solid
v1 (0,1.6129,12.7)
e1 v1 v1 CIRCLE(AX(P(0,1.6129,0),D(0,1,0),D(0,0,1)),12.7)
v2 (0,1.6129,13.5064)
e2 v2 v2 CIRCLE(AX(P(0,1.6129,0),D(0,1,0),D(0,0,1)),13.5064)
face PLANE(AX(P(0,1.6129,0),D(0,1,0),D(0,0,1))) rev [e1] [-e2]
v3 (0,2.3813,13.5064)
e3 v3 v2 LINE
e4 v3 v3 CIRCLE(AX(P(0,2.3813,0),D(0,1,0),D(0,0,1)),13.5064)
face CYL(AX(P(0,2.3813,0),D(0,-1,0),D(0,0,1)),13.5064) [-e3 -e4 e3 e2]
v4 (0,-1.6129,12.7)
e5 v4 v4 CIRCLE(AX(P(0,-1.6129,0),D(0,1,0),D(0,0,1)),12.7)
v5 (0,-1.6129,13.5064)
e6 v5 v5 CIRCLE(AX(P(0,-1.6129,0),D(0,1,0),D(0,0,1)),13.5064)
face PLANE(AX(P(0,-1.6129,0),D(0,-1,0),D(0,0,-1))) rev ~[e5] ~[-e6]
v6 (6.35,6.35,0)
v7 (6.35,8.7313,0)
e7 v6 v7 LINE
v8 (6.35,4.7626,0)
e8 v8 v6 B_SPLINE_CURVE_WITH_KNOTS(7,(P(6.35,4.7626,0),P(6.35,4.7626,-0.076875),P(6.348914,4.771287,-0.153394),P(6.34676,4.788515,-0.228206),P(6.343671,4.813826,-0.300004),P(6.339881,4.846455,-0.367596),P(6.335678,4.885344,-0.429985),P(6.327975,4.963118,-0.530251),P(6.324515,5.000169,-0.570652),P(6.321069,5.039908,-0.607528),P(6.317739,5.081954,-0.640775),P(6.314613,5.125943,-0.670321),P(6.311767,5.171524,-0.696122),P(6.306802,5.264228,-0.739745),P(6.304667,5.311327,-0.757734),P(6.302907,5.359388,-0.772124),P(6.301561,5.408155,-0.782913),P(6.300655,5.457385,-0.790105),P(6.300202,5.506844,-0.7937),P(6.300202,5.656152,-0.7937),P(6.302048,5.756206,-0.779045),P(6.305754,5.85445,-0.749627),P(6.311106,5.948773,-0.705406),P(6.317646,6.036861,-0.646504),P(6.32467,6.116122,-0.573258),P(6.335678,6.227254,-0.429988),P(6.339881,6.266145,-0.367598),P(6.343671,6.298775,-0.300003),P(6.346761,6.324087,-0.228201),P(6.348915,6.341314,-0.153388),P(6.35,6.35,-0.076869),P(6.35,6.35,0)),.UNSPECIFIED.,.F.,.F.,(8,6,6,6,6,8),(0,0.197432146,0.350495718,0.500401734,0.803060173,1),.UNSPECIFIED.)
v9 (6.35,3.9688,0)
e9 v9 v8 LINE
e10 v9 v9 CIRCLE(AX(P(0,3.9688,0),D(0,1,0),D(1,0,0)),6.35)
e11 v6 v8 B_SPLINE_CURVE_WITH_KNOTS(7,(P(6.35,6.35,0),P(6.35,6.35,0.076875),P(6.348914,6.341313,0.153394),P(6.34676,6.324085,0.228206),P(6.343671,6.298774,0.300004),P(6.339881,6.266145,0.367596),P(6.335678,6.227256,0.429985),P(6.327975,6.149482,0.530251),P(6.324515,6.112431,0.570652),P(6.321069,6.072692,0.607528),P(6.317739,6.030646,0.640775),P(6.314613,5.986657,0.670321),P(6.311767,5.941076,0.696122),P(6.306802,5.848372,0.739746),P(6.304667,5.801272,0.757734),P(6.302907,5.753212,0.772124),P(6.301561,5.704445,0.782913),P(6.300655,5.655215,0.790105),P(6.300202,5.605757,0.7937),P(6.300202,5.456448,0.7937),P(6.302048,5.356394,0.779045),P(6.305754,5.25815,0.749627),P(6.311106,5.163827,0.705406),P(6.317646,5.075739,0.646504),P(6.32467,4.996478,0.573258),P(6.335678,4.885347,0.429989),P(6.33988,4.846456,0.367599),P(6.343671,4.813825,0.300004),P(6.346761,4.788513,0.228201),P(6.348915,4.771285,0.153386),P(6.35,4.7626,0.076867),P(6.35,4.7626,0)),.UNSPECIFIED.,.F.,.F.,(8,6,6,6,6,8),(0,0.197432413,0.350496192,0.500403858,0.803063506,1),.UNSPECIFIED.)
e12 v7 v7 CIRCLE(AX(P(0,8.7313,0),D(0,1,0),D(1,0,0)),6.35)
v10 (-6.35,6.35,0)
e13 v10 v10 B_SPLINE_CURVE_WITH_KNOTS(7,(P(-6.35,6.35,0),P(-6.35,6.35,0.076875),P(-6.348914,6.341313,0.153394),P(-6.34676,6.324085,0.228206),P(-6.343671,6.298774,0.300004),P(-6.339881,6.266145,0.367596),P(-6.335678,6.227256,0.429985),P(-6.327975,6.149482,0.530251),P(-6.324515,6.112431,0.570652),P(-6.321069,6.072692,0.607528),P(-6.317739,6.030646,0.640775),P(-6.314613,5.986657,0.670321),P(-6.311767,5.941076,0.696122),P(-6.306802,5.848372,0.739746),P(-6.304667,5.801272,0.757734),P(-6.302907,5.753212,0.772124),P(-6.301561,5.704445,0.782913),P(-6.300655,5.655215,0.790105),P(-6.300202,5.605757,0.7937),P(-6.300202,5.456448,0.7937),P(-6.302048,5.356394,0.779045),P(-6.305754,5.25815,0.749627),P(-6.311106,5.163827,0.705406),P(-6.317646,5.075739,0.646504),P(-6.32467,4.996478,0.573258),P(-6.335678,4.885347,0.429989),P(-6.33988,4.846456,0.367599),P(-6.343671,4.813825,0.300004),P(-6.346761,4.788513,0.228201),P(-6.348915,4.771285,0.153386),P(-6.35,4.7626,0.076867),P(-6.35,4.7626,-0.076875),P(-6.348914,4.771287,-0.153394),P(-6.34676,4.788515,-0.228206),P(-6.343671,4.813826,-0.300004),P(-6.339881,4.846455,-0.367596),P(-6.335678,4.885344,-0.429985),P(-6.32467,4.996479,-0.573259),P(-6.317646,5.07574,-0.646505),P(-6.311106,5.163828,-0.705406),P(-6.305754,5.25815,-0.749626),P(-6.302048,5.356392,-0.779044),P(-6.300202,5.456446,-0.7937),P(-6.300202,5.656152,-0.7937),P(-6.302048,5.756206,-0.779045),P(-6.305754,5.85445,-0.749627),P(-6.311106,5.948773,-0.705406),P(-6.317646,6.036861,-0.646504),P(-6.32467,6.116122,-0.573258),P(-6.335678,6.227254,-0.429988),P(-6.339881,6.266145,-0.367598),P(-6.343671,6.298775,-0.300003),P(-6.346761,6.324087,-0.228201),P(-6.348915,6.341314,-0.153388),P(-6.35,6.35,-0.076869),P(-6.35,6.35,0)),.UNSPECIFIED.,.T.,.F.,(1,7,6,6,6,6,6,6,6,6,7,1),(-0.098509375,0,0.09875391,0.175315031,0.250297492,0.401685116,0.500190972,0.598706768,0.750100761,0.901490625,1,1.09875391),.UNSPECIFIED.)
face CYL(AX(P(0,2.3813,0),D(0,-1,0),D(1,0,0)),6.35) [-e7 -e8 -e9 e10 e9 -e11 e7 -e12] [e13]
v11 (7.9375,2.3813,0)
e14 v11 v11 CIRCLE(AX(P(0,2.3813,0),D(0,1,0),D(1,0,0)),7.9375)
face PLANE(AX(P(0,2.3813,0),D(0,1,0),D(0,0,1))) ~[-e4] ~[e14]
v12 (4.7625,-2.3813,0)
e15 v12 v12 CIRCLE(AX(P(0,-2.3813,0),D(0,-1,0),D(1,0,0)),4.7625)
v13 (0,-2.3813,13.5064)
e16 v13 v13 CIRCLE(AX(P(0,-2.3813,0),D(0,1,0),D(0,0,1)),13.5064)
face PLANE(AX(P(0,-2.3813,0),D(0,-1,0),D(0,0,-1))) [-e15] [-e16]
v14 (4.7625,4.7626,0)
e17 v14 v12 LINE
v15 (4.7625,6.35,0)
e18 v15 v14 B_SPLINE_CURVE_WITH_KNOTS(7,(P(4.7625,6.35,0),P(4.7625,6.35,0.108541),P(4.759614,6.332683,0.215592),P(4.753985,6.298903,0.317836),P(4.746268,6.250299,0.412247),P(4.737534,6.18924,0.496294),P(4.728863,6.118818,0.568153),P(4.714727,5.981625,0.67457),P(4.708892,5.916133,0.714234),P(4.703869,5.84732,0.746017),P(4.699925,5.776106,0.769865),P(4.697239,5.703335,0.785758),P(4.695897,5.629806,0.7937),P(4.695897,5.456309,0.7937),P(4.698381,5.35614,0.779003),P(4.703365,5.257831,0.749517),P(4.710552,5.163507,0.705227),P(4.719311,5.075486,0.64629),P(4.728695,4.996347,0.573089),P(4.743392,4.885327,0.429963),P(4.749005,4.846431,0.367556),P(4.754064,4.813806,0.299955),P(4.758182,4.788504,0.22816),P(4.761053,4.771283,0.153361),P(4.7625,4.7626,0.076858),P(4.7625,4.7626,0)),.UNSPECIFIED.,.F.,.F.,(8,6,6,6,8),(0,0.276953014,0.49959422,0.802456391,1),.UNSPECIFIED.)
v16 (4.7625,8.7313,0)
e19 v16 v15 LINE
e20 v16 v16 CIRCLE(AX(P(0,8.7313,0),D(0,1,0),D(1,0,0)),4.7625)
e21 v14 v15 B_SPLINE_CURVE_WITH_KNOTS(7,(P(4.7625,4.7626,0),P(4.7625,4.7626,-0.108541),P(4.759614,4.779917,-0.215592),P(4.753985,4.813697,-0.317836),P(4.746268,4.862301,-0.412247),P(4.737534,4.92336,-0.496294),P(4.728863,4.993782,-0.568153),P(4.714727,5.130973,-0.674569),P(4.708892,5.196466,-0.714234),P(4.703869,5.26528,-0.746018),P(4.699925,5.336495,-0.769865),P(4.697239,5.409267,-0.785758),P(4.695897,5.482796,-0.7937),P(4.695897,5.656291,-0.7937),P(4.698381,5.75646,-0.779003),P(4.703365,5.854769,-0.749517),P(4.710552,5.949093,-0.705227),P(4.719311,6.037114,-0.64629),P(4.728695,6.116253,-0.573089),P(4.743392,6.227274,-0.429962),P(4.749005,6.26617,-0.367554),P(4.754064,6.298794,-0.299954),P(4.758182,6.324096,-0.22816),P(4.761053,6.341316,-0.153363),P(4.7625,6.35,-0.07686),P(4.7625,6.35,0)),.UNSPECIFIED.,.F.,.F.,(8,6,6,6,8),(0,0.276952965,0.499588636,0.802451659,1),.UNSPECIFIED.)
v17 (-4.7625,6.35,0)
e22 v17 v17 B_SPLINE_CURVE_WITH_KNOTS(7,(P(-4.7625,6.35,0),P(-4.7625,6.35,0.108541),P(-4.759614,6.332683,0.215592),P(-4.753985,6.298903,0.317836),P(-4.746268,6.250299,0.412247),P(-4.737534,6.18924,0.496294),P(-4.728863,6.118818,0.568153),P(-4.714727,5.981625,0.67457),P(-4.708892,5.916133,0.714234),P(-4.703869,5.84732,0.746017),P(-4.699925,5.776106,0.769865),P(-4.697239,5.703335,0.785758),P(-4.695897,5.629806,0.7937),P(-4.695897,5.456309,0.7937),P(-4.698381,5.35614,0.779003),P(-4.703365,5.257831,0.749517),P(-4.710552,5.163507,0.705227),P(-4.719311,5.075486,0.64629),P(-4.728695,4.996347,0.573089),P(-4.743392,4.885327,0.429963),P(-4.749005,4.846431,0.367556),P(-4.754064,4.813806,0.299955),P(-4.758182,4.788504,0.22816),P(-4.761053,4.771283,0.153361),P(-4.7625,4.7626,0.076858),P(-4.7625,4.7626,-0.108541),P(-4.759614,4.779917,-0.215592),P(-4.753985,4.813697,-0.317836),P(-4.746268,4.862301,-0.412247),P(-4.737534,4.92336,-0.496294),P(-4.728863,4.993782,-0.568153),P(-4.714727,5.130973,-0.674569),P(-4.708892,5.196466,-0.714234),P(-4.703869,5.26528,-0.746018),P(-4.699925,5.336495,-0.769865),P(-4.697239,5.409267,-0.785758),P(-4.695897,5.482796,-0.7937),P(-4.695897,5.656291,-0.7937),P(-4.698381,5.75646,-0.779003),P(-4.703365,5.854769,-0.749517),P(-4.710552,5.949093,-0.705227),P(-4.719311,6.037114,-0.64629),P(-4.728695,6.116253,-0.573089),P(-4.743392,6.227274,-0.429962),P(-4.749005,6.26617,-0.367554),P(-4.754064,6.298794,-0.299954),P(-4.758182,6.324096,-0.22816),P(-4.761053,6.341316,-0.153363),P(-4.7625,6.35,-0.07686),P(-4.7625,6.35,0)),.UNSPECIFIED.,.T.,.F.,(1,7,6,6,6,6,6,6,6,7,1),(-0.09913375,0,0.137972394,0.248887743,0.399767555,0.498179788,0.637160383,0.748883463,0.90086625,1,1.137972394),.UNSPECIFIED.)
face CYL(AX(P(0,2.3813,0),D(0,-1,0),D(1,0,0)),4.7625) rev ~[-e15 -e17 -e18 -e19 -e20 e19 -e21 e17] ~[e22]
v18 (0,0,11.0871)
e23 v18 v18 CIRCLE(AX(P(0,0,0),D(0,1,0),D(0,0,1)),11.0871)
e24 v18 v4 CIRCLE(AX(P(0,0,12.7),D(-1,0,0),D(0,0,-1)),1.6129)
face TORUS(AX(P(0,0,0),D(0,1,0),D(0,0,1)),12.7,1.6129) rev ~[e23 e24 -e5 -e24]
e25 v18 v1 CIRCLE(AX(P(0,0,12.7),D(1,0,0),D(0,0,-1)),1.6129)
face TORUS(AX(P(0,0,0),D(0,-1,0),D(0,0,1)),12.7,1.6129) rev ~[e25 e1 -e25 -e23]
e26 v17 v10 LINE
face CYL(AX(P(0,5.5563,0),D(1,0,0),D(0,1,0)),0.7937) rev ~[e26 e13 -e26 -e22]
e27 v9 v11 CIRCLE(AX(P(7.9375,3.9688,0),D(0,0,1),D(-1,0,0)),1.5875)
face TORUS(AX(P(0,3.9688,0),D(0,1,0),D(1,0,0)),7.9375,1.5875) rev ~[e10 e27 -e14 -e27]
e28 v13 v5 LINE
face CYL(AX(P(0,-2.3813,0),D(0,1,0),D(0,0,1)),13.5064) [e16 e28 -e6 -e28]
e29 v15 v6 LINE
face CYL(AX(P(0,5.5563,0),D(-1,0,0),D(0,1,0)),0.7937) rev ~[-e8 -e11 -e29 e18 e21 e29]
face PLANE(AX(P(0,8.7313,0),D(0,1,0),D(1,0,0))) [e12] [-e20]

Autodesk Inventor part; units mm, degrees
ref_plane "YZ Plane" through (0, 0, 0) normal (1, 0, 0) x (0, 1, 0)
ref_plane "XZ Plane" through (0, 0, 0) normal (0, 1, 0) x (-1, 0, 0)
ref_plane "XY Plane" through (0, 0, 0) normal (0, 0, 1) x (1, 0, 0)
sketch "Sketch1" plane through (0, 0, 0) normal (1, 0, 0) x (0, 1, 0)
  line L0 (-2.3813, 13.5064) -> (-2.3813, 0) construction
  line L1 (-2.3813, 0) -> (0, 0) construction
  line L2 (2.3813, 0) -> (2.3813, 13.5064)
  line L3 (2.3813, 13.5064) -> (0, 13.5064)
  line L4 (-2.3813, 13.5064) -> (2.3813, 0) construction
  line L5 (-2.3813, 0) -> (2.3813, 13.5064) construction
  line L6 (0, 12.7) -> (0, 11.0871)
  line L7 (0, 11.0871) -> (0, 13.5064)
  line L8 (0, 13.5064) -> (-2.3813, 13.5064) construction
  line L9 (0, 0) -> (2.3813, 0)
  line L10 (0, 11.0871) -> (0, 0)
  arc A0 (0, 11.0871) -> (1.6129, 12.7) centre (0, 12.7) ccw
  line L11 (1.6129, 12.7) -> (1.6129, 13.5064)
  point P0 (0, 6.7532)
  point P1 (0, 6.7532)
  dimension "d2" = 1.6129
  dimension "d4" = 2.3813
  dimension "d5" = 0.8065
  dimension "d16" = 12.7
revolve "Revolution1" add sketch "Sketch1" angle 360 about axis through (0, 0, 0) along (0, 1, 0) contours L9 L10 A0 L11 L3 L2
mirror "Mirror1" about plane through (0, 0, 11.0871) normal (0, -1, 0) of "Revolution1"
sketch "Sketch2" plane through (0, -2.3813, 0) normal (0, -1, 0) x (1, 0, 0)
  circle A0 centre (0, 0) radius 4.7625
  point P0 (0, 0)
  dimension "d7" = 9.525
extrude "Extrusion1" cut sketch "Sketch2" against normal through all
sketch "Sketch3" plane through (0, 2.3813, 0) normal (0, 1, 0) x (1, 0, 0)
  circle A0 centre (0, 0) radius 4.7625 projected
  circle A1 centre (0, 0) radius 6.35
  dimension "d10" = 1.5875
extrude "Extrusion2" add sketch "Sketch3" along normal blind 6.35
sketch "Sketch4" plane through (0, 0, 0) normal (1, 0, 0) x (0, 1, 0)
  circle A0 centre (5.5563, 0) radius 0.7937
  line L0 (8.7312, -6.35) -> (8.7313, 6.35) construction
  line L1 (2.3813, 6.35) -> (2.3812, -6.35) construction
  line L2 (8.7312, -6.35) -> (8.7313, 6.35) projected
  line L3 (2.3813, 6.35) -> (8.7312, -6.35) construction
  point P0 (0, 0)
  dimension "d13" = 1.5875
extrude "Extrusion3" cut sketch "Sketch4" along normal through all both and the other way through all
fillet "Fillet1" radius 1.5875 1 edges at (-6.35, 2.3813, 0)
equation "\"d5\" = 0.5 * d2"
properties part number "0.5OD_Pulley" material "ABS Plastic"
